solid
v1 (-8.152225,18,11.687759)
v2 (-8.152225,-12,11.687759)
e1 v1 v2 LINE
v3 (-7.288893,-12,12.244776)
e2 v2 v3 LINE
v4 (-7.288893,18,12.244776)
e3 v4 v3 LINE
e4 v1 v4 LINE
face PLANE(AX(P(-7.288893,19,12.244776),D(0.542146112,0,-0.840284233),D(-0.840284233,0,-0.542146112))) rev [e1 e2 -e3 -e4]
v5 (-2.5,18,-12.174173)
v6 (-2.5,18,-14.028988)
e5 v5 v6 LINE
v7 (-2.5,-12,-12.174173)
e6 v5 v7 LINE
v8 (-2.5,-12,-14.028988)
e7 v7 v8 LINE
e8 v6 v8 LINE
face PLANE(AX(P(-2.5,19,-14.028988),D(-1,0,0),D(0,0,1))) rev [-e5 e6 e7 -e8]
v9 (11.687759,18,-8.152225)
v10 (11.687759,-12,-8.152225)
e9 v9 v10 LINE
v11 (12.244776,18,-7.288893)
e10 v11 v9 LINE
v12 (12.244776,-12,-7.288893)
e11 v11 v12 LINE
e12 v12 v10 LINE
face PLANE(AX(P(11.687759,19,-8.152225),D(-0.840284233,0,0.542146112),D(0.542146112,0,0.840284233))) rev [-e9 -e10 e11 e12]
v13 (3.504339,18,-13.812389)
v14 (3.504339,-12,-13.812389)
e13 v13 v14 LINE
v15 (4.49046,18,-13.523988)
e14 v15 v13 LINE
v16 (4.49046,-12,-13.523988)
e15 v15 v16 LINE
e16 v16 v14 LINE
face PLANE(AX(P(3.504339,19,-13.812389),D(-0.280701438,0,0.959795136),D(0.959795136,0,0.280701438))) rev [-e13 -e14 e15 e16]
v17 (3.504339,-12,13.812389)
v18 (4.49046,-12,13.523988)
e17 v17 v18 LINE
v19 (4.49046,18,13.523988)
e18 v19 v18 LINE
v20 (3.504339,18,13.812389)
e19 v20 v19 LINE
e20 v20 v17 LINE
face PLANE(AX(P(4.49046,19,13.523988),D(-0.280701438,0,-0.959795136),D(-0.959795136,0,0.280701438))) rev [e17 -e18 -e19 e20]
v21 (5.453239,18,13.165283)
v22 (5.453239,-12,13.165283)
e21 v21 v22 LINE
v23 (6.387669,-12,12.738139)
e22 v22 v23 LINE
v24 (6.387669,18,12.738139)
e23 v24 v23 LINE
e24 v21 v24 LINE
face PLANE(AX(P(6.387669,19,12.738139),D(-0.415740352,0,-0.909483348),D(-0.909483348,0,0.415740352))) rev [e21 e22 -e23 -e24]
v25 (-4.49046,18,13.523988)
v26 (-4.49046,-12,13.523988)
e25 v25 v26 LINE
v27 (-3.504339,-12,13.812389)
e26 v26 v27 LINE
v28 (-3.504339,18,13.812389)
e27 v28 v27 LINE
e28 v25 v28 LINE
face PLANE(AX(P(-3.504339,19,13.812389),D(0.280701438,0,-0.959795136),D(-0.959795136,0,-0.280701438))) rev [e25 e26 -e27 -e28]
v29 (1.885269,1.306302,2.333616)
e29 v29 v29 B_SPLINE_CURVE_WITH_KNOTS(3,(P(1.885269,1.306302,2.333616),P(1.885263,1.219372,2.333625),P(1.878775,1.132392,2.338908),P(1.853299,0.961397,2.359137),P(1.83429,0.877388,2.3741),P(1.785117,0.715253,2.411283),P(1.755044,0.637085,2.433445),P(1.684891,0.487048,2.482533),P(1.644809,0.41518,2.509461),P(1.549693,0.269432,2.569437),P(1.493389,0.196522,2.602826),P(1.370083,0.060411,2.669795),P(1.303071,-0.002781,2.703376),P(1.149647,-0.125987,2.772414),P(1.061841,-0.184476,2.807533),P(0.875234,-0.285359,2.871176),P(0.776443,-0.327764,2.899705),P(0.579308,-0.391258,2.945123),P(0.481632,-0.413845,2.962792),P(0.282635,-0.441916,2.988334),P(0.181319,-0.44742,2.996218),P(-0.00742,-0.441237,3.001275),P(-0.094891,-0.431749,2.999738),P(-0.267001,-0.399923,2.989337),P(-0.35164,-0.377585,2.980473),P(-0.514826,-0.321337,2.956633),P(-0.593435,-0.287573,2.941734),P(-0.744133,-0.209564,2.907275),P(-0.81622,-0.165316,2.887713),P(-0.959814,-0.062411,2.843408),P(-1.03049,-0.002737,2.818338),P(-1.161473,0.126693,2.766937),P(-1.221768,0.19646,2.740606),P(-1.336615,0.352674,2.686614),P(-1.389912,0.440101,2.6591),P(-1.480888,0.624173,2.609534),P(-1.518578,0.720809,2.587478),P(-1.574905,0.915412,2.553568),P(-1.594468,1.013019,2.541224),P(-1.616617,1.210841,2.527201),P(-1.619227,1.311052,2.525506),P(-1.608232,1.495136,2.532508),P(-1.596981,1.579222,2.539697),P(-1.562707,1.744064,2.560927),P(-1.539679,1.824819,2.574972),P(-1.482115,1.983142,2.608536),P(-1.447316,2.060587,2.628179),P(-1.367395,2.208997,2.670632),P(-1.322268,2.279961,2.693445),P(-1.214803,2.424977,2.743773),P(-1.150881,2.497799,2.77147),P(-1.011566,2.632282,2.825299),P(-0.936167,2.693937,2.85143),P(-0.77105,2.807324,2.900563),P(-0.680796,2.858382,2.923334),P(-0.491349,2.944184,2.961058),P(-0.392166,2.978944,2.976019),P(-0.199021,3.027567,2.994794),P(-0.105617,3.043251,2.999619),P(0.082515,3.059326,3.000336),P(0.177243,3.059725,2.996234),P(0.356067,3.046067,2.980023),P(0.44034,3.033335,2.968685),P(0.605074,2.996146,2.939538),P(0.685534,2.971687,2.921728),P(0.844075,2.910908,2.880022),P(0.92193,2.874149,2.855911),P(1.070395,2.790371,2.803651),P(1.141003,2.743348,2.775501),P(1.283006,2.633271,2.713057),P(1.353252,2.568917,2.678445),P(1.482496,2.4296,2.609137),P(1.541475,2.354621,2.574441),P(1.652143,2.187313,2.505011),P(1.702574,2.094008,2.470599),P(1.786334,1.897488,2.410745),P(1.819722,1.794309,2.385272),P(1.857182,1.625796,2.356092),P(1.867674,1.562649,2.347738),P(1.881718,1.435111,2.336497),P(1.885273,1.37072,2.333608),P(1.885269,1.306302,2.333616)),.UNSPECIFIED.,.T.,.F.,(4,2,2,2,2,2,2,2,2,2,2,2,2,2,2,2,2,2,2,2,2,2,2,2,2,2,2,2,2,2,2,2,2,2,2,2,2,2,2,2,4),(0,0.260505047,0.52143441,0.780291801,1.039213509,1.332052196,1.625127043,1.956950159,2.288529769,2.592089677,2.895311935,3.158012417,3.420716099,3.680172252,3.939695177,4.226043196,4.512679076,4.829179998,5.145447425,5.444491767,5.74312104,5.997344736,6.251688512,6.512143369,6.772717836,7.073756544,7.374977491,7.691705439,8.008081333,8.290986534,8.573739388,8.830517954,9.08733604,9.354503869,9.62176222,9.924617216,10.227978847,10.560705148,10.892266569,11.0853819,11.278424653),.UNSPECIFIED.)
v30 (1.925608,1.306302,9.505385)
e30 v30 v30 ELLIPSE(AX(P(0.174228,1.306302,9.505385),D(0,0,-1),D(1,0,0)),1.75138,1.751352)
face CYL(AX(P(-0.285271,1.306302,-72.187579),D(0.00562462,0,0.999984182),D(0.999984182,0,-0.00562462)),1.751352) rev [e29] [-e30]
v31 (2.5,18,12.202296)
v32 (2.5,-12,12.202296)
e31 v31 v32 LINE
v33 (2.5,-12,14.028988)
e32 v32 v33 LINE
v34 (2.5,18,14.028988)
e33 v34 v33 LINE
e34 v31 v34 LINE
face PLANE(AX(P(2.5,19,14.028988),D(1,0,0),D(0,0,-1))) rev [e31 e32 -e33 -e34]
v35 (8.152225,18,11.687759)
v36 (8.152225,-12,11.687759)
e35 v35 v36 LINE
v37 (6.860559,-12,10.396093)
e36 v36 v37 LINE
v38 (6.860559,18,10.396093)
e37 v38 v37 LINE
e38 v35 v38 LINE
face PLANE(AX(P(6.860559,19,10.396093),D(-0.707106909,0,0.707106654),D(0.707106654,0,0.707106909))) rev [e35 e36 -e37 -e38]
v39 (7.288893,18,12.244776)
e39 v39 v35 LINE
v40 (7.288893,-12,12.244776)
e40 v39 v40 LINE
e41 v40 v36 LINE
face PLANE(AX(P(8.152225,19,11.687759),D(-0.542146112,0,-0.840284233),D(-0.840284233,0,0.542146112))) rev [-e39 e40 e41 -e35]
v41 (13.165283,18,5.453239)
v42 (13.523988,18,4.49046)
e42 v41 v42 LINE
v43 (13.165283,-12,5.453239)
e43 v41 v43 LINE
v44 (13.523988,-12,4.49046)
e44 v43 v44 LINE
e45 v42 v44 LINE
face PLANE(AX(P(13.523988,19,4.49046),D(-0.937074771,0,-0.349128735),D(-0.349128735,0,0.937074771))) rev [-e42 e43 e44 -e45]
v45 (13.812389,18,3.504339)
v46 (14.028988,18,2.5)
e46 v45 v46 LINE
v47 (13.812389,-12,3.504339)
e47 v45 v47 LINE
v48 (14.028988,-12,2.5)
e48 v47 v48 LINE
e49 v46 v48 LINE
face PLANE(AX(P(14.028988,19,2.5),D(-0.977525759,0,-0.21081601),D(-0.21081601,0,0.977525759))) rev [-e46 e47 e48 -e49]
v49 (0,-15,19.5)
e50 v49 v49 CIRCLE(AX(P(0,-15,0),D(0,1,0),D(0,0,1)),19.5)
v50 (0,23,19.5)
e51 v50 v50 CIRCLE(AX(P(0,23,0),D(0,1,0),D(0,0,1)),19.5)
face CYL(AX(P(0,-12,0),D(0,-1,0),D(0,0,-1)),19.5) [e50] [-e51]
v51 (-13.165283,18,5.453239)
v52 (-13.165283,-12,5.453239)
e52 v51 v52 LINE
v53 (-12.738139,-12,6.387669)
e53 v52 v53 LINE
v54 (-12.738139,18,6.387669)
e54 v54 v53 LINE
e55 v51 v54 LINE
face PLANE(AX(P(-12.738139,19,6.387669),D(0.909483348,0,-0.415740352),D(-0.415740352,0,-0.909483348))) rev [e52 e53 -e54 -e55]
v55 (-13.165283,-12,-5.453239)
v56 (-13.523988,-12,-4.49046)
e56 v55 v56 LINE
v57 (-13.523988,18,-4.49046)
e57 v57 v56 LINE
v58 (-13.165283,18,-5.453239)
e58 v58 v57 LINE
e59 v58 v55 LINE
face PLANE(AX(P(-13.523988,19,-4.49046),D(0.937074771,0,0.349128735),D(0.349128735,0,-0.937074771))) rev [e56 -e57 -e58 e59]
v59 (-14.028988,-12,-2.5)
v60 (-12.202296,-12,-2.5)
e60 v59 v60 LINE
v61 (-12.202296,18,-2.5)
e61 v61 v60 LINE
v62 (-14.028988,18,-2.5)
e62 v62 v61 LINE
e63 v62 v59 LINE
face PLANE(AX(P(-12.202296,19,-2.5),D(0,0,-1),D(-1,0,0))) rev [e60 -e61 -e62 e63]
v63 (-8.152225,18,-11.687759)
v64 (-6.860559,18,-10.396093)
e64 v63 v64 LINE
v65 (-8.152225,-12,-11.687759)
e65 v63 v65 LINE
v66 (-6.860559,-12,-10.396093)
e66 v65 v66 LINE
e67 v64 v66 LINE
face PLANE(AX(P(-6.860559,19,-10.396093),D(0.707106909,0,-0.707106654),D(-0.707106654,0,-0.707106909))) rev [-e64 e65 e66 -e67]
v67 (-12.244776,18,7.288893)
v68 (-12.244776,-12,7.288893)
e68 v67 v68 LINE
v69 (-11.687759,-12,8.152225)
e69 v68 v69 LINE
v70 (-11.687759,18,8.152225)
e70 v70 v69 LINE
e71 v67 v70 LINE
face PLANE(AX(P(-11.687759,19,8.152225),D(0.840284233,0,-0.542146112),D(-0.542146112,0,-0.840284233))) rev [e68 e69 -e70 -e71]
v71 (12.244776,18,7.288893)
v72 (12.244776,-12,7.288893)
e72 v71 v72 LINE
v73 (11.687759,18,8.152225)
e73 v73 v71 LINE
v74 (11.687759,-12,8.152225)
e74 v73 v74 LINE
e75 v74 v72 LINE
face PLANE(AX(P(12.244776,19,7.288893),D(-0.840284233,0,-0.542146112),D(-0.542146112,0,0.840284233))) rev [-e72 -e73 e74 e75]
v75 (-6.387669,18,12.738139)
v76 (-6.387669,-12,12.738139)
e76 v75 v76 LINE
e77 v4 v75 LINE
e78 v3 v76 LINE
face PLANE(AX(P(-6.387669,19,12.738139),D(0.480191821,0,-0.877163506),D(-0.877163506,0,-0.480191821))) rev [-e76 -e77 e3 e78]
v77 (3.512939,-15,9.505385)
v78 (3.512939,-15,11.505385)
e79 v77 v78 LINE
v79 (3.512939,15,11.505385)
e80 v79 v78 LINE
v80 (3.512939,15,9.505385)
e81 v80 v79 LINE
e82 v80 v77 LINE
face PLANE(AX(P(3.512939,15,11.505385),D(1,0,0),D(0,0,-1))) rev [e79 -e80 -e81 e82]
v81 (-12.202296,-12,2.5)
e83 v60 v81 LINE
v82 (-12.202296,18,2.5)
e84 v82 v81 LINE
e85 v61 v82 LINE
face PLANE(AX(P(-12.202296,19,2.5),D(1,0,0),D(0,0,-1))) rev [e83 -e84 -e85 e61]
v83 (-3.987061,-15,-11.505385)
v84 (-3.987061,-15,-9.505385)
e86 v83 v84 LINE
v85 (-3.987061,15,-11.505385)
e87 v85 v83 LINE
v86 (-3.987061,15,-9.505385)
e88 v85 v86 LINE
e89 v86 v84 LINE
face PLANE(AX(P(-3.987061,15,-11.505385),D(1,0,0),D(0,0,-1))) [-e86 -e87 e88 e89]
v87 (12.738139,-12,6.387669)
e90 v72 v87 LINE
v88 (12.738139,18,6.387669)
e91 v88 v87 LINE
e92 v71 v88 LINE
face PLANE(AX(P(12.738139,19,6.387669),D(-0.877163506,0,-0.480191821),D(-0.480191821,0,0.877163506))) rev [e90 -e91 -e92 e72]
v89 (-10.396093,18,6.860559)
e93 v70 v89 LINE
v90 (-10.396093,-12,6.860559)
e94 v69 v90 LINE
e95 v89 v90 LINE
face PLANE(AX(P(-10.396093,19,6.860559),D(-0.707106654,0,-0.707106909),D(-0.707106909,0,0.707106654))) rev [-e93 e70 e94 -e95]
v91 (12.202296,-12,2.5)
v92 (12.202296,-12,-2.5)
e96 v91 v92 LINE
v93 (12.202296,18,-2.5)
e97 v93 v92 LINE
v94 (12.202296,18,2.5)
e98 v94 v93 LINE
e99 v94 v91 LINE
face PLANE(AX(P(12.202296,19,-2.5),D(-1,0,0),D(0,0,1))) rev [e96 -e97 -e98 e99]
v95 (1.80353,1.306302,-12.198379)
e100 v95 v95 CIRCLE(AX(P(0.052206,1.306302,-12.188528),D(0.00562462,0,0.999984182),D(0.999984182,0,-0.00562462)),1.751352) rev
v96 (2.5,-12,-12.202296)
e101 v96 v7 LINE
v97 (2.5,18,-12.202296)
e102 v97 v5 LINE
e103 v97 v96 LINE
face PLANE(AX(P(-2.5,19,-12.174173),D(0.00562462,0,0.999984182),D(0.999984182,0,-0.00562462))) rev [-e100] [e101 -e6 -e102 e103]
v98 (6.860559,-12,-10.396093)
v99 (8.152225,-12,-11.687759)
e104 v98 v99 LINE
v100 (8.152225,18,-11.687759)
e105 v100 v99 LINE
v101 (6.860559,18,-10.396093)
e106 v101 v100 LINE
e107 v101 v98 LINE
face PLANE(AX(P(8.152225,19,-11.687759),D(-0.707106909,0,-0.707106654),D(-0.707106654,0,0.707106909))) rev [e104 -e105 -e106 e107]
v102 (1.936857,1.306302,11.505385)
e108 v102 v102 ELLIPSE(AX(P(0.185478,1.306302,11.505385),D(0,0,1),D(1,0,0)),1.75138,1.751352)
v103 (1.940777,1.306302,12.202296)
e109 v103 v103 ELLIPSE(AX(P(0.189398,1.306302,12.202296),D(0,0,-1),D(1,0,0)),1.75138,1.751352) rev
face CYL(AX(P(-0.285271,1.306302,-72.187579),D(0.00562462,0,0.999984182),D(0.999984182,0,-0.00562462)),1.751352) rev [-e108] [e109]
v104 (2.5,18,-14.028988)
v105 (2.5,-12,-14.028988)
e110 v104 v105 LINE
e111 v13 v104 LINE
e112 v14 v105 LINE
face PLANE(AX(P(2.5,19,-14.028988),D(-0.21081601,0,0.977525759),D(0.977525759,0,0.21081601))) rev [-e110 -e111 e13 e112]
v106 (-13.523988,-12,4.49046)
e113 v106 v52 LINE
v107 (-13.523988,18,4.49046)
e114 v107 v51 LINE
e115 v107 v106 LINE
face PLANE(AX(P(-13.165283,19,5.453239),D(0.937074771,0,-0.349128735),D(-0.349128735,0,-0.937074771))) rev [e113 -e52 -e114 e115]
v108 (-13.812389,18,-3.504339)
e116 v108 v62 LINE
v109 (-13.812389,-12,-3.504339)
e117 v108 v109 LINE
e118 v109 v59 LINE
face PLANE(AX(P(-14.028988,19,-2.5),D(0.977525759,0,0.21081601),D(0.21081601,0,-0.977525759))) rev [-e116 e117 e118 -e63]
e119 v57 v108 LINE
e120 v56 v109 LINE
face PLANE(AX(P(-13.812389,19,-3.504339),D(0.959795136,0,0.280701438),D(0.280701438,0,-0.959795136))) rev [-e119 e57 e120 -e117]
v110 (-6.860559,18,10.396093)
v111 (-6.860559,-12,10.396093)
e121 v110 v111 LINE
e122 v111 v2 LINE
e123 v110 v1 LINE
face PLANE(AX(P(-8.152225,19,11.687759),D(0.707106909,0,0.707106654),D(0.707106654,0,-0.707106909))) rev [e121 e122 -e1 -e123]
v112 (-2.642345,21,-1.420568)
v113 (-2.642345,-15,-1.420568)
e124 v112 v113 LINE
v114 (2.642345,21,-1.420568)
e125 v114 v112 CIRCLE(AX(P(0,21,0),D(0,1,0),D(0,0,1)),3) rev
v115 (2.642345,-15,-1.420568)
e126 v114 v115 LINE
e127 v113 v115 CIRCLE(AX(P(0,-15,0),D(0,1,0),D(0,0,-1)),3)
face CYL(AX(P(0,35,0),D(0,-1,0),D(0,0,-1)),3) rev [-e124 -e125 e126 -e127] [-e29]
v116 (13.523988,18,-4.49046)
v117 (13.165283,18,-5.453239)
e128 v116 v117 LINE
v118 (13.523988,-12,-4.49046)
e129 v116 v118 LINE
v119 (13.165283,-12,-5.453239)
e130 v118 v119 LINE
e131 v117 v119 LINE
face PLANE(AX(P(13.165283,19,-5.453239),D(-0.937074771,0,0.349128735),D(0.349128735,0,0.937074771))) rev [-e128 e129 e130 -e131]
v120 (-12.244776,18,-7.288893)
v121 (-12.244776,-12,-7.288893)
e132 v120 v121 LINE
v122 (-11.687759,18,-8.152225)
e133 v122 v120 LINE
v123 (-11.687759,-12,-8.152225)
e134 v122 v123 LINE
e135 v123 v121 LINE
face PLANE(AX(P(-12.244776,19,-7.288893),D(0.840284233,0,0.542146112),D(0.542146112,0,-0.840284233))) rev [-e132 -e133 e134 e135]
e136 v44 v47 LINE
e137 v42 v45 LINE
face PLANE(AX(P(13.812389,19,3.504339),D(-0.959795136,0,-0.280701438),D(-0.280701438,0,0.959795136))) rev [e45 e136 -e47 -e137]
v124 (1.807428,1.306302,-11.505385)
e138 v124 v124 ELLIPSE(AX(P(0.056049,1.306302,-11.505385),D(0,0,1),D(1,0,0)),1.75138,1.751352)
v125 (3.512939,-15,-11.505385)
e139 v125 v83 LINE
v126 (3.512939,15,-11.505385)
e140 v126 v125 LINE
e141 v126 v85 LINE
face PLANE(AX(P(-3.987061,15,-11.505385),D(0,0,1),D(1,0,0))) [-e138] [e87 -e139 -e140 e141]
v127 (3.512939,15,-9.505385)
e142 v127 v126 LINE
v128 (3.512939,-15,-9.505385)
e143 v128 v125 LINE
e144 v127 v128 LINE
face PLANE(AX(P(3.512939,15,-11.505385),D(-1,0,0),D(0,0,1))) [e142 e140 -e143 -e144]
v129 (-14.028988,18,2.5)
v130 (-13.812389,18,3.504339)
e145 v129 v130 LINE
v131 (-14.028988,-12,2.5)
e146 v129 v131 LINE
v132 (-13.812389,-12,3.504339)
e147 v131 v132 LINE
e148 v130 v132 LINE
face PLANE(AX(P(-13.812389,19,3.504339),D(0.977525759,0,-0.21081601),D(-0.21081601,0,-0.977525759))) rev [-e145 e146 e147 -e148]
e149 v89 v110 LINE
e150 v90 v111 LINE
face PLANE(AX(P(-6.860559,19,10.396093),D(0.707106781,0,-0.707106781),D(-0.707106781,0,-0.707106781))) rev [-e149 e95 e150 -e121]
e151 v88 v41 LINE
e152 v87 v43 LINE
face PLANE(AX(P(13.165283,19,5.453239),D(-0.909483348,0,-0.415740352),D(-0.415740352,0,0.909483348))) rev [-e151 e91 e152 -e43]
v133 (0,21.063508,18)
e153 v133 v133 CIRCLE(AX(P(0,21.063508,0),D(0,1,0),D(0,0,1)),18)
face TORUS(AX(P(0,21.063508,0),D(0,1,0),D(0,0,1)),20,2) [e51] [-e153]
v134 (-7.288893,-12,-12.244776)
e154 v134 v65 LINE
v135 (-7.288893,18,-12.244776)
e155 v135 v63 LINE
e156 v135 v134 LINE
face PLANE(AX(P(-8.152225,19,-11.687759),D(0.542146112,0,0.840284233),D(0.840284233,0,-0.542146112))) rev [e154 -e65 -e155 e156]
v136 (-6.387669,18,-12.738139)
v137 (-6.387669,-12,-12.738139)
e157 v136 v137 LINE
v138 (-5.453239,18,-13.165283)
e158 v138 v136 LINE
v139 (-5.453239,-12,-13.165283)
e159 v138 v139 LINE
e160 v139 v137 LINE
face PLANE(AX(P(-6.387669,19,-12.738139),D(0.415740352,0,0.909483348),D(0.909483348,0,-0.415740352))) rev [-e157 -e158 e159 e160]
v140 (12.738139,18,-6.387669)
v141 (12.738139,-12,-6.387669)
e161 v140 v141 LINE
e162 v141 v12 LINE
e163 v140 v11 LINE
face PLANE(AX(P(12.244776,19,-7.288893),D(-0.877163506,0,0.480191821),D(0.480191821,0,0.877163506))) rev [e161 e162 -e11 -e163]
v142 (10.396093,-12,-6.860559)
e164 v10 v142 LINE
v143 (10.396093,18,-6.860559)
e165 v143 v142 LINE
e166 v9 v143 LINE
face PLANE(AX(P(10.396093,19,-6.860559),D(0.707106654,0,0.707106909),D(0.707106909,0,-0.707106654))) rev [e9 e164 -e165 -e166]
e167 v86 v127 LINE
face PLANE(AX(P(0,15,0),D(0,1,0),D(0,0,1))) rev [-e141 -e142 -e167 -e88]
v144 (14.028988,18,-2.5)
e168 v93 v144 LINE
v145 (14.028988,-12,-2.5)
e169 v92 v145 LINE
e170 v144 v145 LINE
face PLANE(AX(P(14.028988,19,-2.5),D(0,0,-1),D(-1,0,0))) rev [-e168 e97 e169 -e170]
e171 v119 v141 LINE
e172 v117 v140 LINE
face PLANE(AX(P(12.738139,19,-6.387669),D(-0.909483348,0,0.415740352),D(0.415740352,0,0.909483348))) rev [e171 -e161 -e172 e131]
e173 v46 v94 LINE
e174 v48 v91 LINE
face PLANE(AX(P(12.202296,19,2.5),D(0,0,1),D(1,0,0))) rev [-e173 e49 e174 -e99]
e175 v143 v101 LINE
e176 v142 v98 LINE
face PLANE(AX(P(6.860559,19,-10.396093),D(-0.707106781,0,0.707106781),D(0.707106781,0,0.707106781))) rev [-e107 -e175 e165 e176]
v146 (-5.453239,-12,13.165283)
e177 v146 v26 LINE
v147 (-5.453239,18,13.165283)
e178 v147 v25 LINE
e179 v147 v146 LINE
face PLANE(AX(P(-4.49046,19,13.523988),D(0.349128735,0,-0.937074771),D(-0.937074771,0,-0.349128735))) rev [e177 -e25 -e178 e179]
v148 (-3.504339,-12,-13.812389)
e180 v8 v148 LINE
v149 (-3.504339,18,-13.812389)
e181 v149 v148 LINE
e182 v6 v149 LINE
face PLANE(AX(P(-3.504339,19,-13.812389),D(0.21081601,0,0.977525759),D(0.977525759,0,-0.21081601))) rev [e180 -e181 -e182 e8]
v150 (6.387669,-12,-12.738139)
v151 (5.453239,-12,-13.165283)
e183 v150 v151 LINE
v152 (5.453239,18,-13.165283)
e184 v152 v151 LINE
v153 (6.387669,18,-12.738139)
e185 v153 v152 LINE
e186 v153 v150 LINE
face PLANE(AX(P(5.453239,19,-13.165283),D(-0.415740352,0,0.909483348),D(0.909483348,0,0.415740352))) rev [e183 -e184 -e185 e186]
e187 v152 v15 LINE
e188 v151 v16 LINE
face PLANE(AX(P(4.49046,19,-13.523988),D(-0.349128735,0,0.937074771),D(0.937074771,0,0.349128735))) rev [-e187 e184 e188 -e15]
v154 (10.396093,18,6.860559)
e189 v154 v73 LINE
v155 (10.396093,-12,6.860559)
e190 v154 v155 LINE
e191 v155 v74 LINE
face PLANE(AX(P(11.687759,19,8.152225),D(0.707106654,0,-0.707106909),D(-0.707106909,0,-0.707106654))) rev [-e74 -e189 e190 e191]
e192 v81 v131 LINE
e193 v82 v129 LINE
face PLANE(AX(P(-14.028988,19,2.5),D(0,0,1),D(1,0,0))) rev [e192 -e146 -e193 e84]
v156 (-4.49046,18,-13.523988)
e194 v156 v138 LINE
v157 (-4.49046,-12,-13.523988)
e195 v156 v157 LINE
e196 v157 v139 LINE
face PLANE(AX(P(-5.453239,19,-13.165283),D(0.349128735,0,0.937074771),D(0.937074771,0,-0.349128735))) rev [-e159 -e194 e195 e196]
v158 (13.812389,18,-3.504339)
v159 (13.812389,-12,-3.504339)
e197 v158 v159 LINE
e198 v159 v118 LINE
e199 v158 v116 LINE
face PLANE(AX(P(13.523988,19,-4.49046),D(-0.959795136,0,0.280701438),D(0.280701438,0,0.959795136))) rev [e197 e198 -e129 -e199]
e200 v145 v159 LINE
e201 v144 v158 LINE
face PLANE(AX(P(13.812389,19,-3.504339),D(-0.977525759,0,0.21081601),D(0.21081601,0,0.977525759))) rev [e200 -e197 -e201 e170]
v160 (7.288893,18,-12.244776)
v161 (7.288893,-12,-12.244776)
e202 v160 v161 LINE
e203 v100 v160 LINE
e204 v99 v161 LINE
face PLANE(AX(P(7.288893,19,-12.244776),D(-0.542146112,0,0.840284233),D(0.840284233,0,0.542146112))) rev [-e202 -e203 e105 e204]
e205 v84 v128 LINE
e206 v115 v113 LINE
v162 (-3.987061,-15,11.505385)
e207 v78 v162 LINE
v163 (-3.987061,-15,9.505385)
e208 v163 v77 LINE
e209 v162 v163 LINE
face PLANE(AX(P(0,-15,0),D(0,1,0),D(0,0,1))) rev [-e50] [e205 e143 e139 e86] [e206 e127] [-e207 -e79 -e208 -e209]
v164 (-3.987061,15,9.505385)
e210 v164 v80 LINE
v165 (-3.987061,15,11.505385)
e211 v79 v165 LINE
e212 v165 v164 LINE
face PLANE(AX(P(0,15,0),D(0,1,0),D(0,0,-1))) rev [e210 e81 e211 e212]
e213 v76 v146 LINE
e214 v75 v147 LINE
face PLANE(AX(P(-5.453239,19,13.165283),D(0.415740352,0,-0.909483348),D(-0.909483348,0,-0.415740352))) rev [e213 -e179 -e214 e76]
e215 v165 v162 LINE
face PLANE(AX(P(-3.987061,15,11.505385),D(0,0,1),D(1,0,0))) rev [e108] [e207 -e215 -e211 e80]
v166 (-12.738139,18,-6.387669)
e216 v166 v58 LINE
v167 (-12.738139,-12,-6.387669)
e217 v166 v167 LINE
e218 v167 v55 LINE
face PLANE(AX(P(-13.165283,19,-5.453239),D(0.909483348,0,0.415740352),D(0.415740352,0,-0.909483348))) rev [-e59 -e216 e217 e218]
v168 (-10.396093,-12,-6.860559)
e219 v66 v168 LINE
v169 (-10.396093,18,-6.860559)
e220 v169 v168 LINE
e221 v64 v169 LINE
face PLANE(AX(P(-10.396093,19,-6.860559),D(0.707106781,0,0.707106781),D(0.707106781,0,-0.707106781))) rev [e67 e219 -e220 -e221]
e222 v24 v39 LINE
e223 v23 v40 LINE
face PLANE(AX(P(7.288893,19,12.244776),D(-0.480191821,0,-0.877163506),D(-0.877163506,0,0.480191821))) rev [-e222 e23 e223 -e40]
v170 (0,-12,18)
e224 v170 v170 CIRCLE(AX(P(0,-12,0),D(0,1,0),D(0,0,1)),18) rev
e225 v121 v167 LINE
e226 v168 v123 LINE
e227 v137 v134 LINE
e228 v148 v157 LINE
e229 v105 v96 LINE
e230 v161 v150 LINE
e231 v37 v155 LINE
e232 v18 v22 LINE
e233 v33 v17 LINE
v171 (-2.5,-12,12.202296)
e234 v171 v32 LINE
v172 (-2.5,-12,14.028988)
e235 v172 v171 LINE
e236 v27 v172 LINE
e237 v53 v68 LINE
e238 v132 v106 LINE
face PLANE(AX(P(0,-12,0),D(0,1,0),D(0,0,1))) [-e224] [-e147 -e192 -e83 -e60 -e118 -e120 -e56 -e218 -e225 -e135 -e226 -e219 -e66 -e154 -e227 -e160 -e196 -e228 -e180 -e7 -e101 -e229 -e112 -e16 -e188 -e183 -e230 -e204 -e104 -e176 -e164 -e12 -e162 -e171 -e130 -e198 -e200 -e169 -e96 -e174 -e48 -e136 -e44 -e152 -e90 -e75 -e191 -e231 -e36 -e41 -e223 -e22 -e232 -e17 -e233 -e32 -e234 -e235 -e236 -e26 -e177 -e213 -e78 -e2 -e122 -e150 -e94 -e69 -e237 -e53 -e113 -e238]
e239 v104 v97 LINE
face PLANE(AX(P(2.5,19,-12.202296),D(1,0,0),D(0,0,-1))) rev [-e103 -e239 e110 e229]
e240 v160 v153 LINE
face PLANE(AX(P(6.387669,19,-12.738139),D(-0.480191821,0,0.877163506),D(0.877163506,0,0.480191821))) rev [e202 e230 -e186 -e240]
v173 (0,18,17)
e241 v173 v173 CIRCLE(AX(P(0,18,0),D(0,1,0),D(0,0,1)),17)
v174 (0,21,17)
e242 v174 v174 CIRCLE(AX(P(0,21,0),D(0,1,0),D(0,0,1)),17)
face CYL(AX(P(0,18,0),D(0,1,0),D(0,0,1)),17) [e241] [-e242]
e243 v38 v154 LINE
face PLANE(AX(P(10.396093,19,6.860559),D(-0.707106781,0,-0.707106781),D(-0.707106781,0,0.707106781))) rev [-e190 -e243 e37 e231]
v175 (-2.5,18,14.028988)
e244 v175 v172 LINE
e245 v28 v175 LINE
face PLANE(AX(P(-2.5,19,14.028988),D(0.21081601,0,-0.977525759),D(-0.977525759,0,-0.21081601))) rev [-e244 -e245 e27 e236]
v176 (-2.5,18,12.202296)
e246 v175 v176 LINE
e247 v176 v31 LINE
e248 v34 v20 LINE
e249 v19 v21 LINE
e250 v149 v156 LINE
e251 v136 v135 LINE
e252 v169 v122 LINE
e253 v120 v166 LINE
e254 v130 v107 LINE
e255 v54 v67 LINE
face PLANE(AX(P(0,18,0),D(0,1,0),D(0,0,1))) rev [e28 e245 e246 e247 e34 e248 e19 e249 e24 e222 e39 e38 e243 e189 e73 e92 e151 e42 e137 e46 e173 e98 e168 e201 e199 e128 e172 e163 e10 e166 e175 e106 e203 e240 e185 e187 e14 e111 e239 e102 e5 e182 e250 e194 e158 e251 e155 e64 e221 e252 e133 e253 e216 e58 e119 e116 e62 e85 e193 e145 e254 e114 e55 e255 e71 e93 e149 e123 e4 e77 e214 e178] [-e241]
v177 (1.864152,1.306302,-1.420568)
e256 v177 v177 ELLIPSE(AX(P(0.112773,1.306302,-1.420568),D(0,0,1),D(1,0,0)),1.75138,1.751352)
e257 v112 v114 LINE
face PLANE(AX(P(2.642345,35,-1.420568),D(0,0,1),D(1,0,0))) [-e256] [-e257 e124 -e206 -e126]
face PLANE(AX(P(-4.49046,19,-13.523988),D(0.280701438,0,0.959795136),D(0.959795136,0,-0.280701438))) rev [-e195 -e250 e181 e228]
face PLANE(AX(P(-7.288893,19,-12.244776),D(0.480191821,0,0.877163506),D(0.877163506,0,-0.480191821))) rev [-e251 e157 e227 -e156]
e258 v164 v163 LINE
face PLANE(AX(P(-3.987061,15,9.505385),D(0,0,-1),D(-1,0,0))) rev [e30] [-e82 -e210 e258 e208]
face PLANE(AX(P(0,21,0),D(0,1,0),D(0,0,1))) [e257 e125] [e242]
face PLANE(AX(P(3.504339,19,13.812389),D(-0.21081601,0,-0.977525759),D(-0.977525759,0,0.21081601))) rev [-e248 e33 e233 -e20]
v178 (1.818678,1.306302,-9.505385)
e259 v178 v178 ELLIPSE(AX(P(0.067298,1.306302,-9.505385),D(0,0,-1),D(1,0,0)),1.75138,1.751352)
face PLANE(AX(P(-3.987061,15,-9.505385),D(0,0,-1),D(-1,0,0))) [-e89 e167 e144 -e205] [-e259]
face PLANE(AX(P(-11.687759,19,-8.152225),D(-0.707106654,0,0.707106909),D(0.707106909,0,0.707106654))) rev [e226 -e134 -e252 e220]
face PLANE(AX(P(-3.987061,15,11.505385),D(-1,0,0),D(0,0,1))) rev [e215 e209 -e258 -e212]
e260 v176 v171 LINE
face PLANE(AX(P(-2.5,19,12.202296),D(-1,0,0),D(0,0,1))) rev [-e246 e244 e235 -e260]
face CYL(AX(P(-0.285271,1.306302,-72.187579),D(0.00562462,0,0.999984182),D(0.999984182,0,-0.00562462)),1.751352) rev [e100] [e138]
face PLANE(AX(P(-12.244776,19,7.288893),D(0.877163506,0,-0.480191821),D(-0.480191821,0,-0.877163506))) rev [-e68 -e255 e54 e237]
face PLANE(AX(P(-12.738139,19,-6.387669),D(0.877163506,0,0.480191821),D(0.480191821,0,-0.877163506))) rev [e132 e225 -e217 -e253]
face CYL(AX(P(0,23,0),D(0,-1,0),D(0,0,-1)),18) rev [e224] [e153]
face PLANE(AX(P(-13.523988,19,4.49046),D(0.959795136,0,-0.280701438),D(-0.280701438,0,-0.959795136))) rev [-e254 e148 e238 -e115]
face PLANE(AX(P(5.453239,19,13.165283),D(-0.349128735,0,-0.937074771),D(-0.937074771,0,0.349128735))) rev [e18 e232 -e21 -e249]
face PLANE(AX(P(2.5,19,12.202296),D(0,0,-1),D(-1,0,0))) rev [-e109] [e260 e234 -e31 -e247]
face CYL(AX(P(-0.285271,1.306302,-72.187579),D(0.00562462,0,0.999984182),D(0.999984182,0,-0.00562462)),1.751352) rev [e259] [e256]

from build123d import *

# Parameters (mm, degrees)
SKETCH1_R                = 17
BOSS_EXTRUDE1_DEPTH      = 3
SKETCH3_R                = 17
BOSS_EXTRUDE2_DEPTH      = 3
BOSS_EXTRUDE3_DEPTH      = 31
CUT_EXTRUDE11_DEPTH      = 60
CUT_EXTRUDE11_DEPTH_BACK = 50
SKETCH7_R                = 1.751351815
CUT_EXTRUDE1_DEPTH       = 50
SKETCH8_W                = 7.5
SKETCH8_H                = 2
CUT_EXTRUDE12_DEPTH      = 30
SKETCH9_R                = 19.5
SKETCH9_R_2              = 18
BOSS_EXTRUDE4_DEPTH      = 38
FILLET1_R                = 2
SKETCH10_R               = 19.500000009
SKETCH10_R_2             = 17.00000001
BOSS_EXTRUDE5_DEPTH      = 3


with BuildPart() as part:
    # Sketch1 → Boss-Extrude1 (new body)
    with BuildSketch(Plane(origin=(0, -15, 0), x_dir=(1, 0, 0), z_dir=(0, 1, 0))):
        with Locations(Location((0, 0, 0), (0, 0, 270))):
            Circle(SKETCH1_R)
    extrude(amount=BOSS_EXTRUDE1_DEPTH)



with BuildPart() as body_2:
    # Sketch3 → Boss-Extrude2 (new body)
    with BuildSketch(Plane(origin=(0, 21, 0), x_dir=(1, 0, 0), z_dir=(0, 1, 0))):
        with Locations(Location((0, 0, 0), (0, 0, 270))):
            Circle(SKETCH3_R)
    extrude(amount=-BOSS_EXTRUDE2_DEPTH)


with BuildPart() as part_1:
    add(part.part)

    add(body_2.part)  # Boss-Extrude3 merges body 2
    # Sketch6 → Boss-Extrude3 (add)
    with BuildSketch(Plane(origin=(0, -12, 0), x_dir=(1, 0, 0), z_dir=(0, 1, 0))):
        Polygon((-10.39609313, -6.860559341), (-11.68775931, -8.152225055), (-12.244775891, -7.288892753), (-12.738139369, -6.387668662), (-13.165283017, -5.453239195), (-13.523988426, -4.490460269), (-13.812389225, -3.504338907), (-14.028987847, -2.499999944), (-12.202296406, -2.499999944), (-12.202296406, 2.499999944), (-14.028987847, 2.499999944), (-13.812389225, 3.504338907), (-13.523988426, 4.490460269), (-13.165283017, 5.453239195), (-12.738139369, 6.387668662), (-12.244775891, 7.288892753), (-11.68775931, 8.152225055), (-10.39609313, 6.860559341), (-6.860559341, 10.39609313), (-8.152225055, 11.68775931), (-7.288892753, 12.244775891), (-6.387668662, 12.738139369), (-5.453239195, 13.165283017), (-4.490460269, 13.523988426), (-3.504338907, 13.812389225), (-2.499999944, 14.028987847), (-2.499999944, 12.174172863), (2.499999944, 12.202296406), (2.499999944, 14.028987847), (3.504338907, 13.812389225), (4.490460269, 13.523988426), (5.453239195, 13.165283017), (6.387668662, 12.738139369), (7.288892753, 12.244775891), (8.152225055, 11.68775931), (6.860559341, 10.39609313), (10.39609313, 6.860559341), (11.68775931, 8.152225055), (12.244775891, 7.288892753), (12.738139369, 6.387668662), (13.165283017, 5.453239195), (13.523988426, 4.490460269), (13.812389225, 3.504338907), (14.028987847, 2.499999944), (12.202296406, 2.499999944), (12.202296406, -2.499999944), (14.028987847, -2.499999944), (13.812389225, -3.504338907), (13.523988426, -4.490460269), (13.165283017, -5.453239195), (12.738139369, -6.387668662), (12.244775891, -7.288892753), (11.68775931, -8.152225055), (10.39609313, -6.860559341), (6.860559341, -10.39609313), (8.152225055, -11.68775931), (7.288892753, -12.244775891), (6.387668662, -12.738139369), (5.453239195, -13.165283017), (4.490460269, -13.523988426), (3.504338907, -13.812389225), (2.499999944, -14.028987847), (2.499999944, -12.202296406), (-2.499999944, -12.202296406), (-2.499999944, -14.028987847), (-3.504338907, -13.812389225), (-4.490460269, -13.523988426), (-5.453239195, -13.165283017), (-6.387668662, -12.738139369), (-7.288892753, -12.244775891), (-8.152225055, -11.68775931), (-6.860559341, -10.39609313), align=None)
    extrude(amount=BOSS_EXTRUDE3_DEPTH)

    # Sketch7 → Cut-Extrude11 (cut, two sides: drawn at the far end of the back side and taken through both)
    with BuildSketch(Plane(origin=(-0.068553102, 0, -12.187849043), x_dir=(-0.9999841817006155, 0, 0.005624619858302935), z_dir=(-0.005624619858302935, 0, -0.9999841817006155)).offset(-CUT_EXTRUDE11_DEPTH_BACK)):
        with Locations(Location((-0.120761258, 1.306302196, 0), (0, 0, 180))):
            Circle(SKETCH7_R)
    extrude(amount=CUT_EXTRUDE11_DEPTH + CUT_EXTRUDE11_DEPTH_BACK, mode=Mode.SUBTRACT)

    # Sketch2 → Cut-Extrude1 (cut)
    with BuildSketch(Plane(origin=(0, -15, 0), x_dir=(1, 0, 0), z_dir=(0, 1, 0))):
        with BuildLine():
            Line((2.642344683, 1.420568442), (-2.642344683, 1.420568442))
            ThreePointArc((-2.642344683, 1.420568442), (0, -2.999999869), (2.642344683, 1.420568442))
        make_face()
    extrude(amount=CUT_EXTRUDE1_DEPTH, mode=Mode.SUBTRACT)

    # Sketch8 → Cut-Extrude12 (cut)
    with BuildSketch(Plane(origin=(0, -15, 0), x_dir=(1, 0, 0), z_dir=(0, 1, 0))):
        with Locations((-0.237061367, 10.505385433)):
            Rectangle(SKETCH8_W, SKETCH8_H)
    cut_extrude12 = extrude(amount=CUT_EXTRUDE12_DEPTH, mode=Mode.SUBTRACT)

    # Mirror1: Cut-Extrude12 across plane
    add(cut_extrude12.mirror(Plane.XY), mode=Mode.SUBTRACT)



with BuildPart() as body_2_2:
    # Sketch9 → Boss-Extrude4 (new body)
    with BuildSketch(Plane(origin=(0, -15, 0), x_dir=(1, 0, 0), z_dir=(0, 1, 0))):
        with Locations(Location((0, 0, 0), (0, 0, 270))):
            Circle(SKETCH9_R)
        with Locations(Location((0, 0, 0), (0, 0, 270))):
            Circle(SKETCH9_R_2, mode=Mode.SUBTRACT)
    extrude(amount=BOSS_EXTRUDE4_DEPTH)

    # Fillet1
    # the kernel refuses this fillet: 2 mm, written as the material it takes off along each edge
    with BuildSketch(Plane(origin=(0, 23, 0), x_dir=(0, 0, 1), z_dir=(-1, 0, 0))) as fillet1_piece_1:
        with BuildLine():
            CenterArc((20, -1.936491673), FILLET1_R, 104.477512186, 75.522487814)
            Line((19.5, 0), (19.49, 0.038729833))
            ThreePointArc((19.49, 0.038729833), (18.75, 0.04), (18, 0.04))
            Line((18, 0.04), (17.96, 0))
            Line((17.96, 0), (17.96, -1.936491673))
            Line((17.96, -1.936491673), (18, -1.936491673))
        make_face()
    revolve(axis=Axis((0, 23, 0), (0, 1, 0)), mode=Mode.SUBTRACT)


with BuildPart() as part_2:
    add(part_1.part)

    add(body_2_2.part)  # Boss-Extrude5 merges body 2 2
    # Sketch10 → Boss-Extrude5 (add)
    with BuildSketch(Plane(origin=(0, -15, 0), x_dir=(1, 0, 0), z_dir=(0, 1, 0))):
        with Locations(Location((0, 1.03e-07, 0), (0, 0, 270))):
            Circle(SKETCH10_R)
        with Locations(Location((0, 1.03e-07, 0), (0, 0, 270))):
            Circle(SKETCH10_R_2, mode=Mode.SUBTRACT)
    extrude(amount=BOSS_EXTRUDE5_DEPTH)


solid = part_2.part
